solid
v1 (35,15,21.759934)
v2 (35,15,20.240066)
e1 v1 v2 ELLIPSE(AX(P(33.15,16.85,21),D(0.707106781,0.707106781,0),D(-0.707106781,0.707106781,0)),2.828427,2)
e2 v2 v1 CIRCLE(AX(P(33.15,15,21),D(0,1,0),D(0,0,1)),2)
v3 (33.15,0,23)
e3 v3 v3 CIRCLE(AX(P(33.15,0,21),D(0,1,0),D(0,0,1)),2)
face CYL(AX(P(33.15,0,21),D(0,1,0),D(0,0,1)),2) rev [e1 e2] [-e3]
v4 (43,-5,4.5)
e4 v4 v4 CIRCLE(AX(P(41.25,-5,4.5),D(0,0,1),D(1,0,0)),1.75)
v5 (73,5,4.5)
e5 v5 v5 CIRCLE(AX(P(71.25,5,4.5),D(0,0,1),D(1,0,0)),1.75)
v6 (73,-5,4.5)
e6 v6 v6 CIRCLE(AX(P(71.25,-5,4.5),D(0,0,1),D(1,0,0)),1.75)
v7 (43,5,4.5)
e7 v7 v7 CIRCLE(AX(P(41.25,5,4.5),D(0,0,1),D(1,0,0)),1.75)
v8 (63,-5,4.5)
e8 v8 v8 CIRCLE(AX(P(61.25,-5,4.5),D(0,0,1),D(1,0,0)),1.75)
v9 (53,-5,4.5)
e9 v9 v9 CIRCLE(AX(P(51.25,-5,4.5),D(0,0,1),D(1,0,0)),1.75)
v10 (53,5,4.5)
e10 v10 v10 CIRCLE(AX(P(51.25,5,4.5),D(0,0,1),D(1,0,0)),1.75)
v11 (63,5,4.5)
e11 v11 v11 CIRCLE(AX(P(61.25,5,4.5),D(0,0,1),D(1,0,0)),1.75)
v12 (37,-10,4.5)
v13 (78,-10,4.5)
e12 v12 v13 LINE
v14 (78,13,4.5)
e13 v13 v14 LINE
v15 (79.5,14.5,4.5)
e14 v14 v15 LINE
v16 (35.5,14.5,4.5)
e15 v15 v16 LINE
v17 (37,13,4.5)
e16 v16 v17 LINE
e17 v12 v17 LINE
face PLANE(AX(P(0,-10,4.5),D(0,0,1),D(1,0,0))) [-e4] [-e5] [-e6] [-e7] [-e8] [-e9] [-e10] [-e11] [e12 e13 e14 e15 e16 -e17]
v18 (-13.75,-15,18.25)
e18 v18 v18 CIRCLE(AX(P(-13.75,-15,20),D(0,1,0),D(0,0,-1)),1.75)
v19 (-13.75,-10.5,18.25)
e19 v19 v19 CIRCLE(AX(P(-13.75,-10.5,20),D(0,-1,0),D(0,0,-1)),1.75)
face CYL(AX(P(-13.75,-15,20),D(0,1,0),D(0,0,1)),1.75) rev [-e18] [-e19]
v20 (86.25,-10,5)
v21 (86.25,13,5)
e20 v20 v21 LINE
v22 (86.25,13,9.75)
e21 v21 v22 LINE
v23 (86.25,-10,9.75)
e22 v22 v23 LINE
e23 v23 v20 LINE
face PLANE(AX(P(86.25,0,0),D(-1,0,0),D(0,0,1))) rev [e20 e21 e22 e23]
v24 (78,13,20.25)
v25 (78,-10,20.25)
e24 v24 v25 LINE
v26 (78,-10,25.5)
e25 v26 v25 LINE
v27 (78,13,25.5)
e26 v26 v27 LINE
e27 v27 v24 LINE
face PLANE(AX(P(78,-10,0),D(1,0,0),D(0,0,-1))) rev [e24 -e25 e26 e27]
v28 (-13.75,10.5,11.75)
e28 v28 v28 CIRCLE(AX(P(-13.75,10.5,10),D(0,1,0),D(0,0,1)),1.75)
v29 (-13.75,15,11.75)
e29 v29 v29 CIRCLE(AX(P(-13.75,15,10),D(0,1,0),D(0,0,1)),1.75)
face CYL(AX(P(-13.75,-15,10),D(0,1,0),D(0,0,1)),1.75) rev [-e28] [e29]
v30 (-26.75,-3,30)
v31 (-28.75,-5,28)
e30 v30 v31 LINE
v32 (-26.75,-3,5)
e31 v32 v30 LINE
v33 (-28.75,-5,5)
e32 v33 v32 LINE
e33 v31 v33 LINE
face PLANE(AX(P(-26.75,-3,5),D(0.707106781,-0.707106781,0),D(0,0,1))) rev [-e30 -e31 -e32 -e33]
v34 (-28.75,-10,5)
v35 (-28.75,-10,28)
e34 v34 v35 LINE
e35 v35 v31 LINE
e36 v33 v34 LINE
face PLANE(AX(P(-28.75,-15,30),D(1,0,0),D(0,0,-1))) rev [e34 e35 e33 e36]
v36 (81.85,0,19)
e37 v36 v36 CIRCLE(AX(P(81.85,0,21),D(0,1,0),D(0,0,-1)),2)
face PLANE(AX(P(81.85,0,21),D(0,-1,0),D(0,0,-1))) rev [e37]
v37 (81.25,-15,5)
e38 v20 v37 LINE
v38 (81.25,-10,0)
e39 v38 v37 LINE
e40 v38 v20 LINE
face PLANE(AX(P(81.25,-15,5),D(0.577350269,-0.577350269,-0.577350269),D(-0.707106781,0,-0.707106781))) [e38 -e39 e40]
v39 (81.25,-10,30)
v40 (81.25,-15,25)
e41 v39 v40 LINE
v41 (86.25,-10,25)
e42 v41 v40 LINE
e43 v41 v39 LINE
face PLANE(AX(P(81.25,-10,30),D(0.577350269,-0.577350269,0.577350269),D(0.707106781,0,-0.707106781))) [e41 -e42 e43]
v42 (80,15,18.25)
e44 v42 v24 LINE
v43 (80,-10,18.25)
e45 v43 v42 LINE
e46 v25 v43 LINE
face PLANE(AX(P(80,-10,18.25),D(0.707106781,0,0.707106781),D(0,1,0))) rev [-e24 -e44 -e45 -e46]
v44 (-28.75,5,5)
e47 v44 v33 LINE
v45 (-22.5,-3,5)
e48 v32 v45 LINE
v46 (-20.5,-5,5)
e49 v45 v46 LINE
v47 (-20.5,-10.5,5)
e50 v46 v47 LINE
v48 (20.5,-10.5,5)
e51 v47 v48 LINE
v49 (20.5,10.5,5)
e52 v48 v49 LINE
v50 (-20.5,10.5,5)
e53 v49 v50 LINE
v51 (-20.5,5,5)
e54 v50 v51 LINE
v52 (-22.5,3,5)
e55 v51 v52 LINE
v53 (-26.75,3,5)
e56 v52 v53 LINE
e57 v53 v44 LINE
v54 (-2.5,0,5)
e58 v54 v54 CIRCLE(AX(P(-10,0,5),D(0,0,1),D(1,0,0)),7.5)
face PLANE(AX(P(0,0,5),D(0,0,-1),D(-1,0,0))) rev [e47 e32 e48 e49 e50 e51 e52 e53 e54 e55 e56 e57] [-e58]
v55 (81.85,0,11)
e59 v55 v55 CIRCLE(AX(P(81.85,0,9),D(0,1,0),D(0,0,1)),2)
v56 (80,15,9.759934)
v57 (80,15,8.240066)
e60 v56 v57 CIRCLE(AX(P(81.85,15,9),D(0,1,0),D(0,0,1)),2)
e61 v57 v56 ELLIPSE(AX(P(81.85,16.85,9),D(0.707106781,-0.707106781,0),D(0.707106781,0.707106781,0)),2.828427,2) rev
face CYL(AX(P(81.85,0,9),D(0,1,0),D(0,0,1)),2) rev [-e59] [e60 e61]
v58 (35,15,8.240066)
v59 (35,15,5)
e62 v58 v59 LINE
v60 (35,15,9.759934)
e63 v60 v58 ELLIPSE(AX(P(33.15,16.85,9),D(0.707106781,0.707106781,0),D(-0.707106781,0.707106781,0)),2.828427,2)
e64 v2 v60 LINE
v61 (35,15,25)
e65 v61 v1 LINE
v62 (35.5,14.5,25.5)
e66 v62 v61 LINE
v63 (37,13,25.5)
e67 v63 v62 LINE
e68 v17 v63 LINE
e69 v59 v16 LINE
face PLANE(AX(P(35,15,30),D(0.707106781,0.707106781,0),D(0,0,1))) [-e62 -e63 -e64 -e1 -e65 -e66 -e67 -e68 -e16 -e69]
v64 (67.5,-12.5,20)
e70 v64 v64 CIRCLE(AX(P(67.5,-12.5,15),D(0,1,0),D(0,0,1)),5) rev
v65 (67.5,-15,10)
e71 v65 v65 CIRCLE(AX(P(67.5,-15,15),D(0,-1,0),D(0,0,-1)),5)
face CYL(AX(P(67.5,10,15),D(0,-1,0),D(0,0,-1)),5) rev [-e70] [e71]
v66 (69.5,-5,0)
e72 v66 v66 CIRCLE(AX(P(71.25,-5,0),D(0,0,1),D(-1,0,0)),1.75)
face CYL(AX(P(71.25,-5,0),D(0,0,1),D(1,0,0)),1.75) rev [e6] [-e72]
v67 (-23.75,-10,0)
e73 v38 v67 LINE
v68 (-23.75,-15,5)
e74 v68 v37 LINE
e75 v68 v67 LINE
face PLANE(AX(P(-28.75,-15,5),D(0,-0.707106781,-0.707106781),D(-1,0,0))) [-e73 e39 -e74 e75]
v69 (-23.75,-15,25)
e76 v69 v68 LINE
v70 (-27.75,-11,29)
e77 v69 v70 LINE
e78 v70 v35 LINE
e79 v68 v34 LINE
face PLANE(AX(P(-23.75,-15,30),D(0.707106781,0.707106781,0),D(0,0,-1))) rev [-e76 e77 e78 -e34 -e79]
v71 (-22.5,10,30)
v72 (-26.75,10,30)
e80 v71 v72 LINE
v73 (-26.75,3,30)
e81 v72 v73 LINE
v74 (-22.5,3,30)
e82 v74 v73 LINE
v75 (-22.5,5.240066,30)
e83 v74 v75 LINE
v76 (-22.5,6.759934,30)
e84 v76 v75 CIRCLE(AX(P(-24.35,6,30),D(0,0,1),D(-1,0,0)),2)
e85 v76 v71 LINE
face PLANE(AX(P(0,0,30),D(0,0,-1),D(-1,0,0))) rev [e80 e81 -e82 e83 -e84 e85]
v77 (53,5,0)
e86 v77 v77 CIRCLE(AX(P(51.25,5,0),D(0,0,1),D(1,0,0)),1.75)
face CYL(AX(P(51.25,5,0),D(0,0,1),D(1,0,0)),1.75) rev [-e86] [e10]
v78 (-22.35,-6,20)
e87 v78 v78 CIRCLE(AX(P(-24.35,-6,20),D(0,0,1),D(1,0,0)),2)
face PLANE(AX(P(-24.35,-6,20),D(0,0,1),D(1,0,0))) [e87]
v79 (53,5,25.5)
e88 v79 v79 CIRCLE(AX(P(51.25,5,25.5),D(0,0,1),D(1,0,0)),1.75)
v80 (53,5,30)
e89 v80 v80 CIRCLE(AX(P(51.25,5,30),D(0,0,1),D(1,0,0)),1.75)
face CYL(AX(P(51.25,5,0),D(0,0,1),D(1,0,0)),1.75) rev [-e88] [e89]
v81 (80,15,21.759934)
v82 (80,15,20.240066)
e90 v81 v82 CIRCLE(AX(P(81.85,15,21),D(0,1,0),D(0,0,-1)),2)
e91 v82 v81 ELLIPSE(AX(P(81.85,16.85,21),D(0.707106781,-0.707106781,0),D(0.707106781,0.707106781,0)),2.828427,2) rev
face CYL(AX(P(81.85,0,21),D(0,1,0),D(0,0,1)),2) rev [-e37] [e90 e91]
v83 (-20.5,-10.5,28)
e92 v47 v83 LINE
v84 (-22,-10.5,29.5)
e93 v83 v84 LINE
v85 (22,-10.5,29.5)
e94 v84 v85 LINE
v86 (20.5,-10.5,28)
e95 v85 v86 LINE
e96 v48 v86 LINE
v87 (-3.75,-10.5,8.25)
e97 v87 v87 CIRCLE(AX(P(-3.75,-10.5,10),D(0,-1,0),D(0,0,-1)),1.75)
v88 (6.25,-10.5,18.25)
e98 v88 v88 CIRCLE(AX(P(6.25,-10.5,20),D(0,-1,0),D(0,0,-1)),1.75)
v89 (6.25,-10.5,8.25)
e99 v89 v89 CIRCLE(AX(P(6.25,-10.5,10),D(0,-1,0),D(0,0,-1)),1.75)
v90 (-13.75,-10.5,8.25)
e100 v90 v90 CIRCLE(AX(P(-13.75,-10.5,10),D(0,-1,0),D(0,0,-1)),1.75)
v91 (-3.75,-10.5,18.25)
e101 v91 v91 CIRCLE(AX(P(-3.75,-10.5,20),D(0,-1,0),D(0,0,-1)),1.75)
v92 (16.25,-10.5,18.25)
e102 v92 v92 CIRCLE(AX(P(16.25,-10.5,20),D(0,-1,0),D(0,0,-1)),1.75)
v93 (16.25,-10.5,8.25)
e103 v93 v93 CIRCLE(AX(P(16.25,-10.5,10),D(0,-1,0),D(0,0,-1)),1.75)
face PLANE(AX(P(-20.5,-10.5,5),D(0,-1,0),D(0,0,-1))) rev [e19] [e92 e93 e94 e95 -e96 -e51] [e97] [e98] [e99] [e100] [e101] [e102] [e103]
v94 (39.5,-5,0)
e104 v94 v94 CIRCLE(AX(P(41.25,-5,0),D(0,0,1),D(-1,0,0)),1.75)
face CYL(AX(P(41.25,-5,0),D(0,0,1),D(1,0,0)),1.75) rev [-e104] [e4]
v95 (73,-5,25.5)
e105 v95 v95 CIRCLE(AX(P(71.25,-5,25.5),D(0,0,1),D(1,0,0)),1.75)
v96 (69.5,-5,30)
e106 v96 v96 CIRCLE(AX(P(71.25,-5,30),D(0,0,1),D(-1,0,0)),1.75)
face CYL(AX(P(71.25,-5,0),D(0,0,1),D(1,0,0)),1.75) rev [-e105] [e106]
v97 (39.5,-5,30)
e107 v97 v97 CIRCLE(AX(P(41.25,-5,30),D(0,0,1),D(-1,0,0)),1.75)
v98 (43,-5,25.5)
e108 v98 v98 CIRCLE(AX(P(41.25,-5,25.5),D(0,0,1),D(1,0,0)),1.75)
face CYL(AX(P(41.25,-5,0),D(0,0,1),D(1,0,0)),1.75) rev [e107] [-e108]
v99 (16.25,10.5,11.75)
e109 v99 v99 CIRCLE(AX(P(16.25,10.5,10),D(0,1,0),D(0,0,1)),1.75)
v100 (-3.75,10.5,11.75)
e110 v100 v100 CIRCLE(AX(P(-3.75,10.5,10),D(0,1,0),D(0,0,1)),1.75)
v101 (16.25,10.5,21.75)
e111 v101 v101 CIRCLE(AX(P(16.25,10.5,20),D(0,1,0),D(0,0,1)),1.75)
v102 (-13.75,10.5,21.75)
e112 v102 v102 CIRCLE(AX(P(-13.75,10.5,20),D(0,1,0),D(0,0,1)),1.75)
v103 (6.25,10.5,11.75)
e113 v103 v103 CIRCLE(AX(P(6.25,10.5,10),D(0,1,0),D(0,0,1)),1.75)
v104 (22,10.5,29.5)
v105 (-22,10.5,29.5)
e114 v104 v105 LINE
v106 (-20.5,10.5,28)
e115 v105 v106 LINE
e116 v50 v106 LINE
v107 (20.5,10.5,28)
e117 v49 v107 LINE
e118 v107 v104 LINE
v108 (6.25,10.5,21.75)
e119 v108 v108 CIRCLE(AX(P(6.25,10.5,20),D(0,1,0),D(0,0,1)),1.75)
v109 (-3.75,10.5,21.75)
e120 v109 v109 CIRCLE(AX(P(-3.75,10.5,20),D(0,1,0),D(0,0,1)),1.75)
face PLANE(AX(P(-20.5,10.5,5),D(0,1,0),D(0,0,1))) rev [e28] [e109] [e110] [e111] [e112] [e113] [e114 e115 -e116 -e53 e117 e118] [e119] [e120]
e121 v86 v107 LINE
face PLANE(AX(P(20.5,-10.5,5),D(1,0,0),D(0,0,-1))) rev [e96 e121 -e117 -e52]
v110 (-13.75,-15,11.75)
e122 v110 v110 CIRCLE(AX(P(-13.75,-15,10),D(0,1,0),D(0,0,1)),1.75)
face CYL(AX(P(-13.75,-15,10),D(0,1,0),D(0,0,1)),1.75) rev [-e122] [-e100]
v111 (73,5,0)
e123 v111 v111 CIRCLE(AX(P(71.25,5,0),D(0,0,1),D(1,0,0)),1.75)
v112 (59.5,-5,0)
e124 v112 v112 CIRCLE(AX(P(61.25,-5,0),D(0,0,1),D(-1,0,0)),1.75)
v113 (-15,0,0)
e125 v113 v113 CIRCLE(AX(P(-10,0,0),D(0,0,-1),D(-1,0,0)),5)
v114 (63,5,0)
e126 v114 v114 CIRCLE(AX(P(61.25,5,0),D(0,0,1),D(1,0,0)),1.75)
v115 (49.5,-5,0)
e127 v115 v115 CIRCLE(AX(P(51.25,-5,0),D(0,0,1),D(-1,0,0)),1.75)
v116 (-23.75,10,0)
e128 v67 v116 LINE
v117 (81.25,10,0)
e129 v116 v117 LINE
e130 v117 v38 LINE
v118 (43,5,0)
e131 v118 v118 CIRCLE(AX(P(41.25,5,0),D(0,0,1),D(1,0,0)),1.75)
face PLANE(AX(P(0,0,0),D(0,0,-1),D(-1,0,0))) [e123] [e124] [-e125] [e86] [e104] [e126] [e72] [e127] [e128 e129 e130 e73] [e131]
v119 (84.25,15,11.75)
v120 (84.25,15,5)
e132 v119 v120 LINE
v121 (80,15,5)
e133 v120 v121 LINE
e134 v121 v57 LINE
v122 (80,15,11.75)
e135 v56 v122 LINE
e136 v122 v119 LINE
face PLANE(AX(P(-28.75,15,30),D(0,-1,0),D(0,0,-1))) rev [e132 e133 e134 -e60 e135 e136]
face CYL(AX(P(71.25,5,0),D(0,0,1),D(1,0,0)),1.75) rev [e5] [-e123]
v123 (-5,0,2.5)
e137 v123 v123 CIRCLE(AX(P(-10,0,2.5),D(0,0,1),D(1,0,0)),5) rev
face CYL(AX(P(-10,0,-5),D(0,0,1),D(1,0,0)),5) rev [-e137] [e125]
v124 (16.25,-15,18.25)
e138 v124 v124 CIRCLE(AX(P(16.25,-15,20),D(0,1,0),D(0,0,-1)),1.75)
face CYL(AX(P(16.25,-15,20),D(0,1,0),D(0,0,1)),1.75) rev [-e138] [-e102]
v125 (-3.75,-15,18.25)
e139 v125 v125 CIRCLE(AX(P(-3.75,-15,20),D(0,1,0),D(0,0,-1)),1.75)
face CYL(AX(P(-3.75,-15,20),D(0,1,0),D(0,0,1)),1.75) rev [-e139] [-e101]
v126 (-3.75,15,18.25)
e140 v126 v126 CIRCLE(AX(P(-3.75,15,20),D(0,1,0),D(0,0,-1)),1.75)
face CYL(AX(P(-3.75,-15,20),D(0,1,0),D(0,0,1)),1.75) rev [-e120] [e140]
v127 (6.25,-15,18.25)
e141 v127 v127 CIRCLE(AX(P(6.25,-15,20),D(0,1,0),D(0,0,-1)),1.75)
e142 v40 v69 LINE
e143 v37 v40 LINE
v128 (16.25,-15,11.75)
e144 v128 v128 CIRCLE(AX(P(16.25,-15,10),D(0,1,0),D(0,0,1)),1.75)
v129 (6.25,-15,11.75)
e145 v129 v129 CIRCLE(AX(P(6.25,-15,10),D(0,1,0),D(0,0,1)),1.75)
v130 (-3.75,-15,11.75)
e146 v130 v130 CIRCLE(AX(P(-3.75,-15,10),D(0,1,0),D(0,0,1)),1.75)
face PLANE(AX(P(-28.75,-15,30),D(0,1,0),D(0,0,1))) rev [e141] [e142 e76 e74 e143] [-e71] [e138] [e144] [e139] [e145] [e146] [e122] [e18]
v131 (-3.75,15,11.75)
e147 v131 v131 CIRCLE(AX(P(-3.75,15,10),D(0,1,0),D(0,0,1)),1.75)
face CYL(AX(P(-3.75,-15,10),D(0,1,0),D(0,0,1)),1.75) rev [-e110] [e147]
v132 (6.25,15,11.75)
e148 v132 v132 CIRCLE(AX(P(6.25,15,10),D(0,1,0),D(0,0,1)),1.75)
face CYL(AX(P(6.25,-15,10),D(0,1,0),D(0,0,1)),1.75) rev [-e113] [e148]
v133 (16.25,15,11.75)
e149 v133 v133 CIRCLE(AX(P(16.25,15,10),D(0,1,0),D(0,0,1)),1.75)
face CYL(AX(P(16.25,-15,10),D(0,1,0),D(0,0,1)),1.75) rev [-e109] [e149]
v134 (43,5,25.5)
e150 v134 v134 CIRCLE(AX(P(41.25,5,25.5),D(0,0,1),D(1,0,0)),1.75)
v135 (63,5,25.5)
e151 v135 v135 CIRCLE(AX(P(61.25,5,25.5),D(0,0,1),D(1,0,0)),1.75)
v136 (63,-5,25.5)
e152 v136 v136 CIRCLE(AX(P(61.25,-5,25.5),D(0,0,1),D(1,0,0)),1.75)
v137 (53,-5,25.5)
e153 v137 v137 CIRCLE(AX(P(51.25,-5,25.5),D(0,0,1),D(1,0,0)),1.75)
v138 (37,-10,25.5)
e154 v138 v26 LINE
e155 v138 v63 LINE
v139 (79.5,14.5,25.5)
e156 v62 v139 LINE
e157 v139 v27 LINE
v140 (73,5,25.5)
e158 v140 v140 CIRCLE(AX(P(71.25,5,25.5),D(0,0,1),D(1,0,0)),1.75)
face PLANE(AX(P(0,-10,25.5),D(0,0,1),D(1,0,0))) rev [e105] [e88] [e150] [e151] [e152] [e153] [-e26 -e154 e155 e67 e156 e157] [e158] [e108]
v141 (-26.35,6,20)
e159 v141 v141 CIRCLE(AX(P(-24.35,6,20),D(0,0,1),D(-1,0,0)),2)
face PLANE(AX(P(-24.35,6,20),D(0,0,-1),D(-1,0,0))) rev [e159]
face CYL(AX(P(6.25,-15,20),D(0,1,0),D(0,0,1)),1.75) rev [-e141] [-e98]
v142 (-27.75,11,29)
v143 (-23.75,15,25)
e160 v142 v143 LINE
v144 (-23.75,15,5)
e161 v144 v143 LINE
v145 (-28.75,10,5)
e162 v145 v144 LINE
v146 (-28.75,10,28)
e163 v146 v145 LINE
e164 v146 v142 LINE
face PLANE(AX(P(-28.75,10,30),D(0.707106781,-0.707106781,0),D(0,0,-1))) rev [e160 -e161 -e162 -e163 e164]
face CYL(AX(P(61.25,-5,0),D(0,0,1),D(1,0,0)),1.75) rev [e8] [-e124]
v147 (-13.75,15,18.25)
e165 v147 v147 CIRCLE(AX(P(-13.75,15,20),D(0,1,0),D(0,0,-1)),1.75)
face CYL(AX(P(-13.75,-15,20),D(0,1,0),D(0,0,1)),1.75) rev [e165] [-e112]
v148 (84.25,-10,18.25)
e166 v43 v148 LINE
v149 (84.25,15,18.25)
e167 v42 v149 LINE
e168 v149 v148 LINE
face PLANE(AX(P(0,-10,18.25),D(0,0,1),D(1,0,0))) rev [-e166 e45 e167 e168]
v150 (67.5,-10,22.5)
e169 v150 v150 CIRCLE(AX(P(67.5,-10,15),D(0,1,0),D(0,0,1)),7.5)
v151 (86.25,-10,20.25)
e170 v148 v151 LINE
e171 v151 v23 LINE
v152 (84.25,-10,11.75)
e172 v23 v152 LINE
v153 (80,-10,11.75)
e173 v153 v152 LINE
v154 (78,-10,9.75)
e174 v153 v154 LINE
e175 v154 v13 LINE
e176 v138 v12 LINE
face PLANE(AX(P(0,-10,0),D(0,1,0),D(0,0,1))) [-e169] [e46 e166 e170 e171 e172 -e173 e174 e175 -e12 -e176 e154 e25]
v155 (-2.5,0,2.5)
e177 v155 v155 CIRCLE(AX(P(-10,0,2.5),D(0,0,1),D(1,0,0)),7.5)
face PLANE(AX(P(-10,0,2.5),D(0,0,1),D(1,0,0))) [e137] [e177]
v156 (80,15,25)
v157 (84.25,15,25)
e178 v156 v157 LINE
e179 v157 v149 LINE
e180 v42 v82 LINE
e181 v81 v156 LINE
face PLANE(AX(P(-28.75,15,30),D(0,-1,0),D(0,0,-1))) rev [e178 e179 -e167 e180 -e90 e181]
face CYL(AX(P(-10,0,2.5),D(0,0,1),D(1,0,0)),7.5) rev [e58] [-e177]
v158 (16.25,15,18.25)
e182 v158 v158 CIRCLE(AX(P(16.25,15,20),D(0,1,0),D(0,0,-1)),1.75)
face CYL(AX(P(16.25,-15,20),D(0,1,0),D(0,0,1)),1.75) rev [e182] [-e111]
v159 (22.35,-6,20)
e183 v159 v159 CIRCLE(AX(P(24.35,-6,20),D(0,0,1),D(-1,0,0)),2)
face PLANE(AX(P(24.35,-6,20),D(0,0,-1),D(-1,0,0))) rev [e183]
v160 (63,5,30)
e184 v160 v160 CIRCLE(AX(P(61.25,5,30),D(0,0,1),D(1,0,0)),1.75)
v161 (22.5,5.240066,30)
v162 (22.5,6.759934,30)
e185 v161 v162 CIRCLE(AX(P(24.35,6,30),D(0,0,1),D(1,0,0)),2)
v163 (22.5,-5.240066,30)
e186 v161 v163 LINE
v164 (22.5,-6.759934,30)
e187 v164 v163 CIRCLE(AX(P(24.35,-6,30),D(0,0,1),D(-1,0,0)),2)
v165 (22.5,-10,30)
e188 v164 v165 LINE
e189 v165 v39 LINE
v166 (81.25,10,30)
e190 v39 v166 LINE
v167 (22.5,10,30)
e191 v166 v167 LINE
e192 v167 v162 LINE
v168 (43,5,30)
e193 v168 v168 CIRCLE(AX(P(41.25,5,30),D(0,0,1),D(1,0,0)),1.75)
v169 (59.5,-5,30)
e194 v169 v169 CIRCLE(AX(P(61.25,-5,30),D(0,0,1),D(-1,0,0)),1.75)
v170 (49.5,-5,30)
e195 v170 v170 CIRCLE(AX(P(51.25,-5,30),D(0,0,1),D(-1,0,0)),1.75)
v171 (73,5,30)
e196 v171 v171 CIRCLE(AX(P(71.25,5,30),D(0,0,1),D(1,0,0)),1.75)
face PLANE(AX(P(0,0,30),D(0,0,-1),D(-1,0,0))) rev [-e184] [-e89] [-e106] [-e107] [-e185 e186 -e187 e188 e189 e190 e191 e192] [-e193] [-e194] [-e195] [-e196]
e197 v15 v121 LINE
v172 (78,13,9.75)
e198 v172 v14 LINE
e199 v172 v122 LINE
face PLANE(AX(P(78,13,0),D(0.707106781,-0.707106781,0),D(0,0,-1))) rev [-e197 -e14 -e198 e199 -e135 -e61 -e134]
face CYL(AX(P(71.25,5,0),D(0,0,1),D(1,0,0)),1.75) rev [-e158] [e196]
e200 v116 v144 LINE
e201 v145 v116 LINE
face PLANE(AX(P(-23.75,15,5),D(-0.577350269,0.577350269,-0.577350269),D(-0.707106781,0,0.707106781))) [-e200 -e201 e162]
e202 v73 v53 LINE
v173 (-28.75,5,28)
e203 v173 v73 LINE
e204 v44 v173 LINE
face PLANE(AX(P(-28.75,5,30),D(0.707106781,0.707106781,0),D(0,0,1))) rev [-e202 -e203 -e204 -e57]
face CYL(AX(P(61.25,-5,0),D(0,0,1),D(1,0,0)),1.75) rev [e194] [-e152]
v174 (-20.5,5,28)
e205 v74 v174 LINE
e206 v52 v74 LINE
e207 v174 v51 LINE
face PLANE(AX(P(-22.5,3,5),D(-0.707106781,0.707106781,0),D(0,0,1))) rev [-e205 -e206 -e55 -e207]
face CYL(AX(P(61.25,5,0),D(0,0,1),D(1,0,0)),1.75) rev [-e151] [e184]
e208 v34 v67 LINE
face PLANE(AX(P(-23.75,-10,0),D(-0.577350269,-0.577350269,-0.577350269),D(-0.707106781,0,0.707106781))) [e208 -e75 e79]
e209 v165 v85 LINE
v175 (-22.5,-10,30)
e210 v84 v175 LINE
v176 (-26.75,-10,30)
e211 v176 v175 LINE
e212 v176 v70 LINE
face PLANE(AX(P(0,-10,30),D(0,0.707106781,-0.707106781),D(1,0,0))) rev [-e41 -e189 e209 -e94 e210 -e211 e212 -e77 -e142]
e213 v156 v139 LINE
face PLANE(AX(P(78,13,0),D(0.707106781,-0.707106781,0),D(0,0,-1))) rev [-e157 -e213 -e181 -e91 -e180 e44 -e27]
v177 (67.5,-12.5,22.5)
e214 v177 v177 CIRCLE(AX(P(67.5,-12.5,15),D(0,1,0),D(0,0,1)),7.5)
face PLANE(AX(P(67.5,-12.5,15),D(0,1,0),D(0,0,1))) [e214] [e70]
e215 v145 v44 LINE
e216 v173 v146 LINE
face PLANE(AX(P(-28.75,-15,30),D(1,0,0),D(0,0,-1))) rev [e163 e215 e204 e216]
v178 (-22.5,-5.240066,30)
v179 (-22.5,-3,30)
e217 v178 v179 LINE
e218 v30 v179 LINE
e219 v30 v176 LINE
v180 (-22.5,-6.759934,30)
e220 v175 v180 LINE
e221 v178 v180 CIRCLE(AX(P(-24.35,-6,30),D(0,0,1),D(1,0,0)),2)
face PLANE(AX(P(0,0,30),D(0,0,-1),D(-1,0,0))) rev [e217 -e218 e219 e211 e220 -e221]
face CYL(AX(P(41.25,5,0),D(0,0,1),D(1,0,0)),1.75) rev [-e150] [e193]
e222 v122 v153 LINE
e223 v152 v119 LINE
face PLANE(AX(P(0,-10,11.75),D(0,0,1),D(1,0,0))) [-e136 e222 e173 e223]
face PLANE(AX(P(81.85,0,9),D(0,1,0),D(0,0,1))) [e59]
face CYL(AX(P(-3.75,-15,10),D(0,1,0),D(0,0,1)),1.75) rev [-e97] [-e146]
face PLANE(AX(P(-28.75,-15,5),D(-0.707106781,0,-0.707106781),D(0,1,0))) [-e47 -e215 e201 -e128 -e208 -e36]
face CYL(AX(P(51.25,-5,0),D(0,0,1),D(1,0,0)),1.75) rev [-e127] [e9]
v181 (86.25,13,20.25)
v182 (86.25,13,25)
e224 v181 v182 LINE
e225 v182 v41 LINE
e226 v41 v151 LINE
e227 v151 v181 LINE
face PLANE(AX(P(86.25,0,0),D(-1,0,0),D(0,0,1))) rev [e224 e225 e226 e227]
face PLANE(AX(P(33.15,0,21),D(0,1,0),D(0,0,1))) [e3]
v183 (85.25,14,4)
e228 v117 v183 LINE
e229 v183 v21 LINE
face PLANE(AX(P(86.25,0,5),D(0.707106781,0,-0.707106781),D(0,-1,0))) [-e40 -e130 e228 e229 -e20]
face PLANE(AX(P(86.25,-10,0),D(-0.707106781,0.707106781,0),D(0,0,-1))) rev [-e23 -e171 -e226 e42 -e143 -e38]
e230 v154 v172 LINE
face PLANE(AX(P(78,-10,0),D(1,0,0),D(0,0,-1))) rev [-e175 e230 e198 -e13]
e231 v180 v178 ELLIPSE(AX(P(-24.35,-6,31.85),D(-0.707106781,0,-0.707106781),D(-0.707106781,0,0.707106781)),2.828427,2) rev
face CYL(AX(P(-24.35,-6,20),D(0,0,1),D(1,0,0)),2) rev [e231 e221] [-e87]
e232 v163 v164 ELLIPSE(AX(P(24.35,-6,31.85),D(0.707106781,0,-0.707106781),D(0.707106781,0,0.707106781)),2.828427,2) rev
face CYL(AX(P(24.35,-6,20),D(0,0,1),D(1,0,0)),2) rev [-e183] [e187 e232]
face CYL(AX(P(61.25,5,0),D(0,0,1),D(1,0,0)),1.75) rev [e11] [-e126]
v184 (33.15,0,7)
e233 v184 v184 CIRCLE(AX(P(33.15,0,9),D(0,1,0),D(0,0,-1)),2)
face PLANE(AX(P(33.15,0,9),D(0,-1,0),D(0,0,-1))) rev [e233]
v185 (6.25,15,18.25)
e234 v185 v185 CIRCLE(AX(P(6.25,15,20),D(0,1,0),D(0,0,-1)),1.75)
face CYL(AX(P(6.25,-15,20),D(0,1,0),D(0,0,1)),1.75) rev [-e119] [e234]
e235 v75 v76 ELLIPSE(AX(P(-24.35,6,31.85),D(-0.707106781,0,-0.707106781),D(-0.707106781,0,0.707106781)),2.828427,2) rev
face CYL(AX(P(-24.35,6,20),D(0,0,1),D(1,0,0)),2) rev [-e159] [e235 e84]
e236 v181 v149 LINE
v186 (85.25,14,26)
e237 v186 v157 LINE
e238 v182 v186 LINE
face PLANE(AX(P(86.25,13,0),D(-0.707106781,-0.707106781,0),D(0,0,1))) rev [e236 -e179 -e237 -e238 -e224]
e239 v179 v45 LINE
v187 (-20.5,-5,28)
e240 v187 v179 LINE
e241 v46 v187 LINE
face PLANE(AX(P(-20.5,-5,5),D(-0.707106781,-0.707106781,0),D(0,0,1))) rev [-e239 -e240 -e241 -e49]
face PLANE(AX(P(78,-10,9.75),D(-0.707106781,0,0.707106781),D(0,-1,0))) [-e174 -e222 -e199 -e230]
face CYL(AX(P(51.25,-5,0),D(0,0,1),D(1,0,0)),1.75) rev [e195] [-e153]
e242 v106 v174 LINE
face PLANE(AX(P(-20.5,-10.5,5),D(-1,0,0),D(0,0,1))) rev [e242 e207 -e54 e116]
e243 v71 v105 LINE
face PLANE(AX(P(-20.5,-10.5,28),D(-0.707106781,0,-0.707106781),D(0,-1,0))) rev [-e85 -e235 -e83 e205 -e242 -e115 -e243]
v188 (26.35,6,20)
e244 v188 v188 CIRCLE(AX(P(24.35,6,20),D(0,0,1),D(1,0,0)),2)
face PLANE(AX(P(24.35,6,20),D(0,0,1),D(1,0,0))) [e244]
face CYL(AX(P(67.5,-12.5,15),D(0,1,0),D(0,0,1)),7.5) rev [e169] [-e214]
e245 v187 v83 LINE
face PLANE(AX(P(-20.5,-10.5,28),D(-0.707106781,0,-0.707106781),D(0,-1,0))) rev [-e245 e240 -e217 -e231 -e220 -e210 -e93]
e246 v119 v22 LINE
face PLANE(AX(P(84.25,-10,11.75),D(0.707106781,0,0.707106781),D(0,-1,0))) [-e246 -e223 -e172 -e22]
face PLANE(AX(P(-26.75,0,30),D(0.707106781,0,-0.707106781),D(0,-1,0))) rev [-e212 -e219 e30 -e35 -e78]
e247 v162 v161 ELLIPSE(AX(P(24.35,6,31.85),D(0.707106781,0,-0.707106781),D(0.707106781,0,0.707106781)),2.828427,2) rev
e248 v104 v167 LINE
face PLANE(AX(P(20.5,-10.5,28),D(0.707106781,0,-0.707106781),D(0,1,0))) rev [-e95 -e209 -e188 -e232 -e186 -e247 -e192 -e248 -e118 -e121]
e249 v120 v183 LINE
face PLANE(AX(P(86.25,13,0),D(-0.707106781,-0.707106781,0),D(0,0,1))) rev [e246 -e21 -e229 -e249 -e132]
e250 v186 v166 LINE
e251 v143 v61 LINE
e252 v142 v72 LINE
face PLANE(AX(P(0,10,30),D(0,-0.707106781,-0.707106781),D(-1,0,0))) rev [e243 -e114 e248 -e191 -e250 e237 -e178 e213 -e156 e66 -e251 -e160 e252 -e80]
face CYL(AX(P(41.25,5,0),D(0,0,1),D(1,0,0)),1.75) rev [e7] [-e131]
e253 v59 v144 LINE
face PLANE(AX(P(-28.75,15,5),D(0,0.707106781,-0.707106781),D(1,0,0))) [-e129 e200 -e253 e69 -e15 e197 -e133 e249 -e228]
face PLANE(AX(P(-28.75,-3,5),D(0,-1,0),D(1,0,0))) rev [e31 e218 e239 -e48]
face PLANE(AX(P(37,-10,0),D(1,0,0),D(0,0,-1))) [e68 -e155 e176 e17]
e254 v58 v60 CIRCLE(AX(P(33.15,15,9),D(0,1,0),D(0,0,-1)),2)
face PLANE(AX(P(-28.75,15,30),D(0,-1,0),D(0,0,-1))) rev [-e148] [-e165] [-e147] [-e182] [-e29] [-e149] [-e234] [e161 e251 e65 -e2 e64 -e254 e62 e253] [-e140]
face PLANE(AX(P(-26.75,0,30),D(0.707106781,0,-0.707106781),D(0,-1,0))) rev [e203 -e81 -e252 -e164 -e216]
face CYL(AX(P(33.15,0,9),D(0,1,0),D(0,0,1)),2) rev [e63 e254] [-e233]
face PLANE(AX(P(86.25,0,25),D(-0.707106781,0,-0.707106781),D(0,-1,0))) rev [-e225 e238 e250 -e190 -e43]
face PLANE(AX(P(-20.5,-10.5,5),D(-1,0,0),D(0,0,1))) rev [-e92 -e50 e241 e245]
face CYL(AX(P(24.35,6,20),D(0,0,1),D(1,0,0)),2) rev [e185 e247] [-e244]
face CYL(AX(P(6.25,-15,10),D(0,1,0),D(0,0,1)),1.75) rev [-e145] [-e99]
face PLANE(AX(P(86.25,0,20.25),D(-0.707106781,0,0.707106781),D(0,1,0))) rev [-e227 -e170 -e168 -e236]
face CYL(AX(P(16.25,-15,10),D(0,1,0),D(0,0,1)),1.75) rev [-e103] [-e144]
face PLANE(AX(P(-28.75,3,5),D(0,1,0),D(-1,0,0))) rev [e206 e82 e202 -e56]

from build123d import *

# Parameters (mm, degrees)
SKETCH1_W           = 57.5
SKETCH1_H           = 30
BOSS_EXTRUDE1_DEPTH = 30
SKETCH2_W           = 41
SKETCH2_H           = 21
CUT_EXTRUDE1_DEPTH  = 25
SKETCH8_R           = 2
CUT_EXTRUDE6_DEPTH  = 10
SKETCH9_W           = 8.25
SKETCH9_H           = 6
CUT_EXTRUDE7_DEPTH  = 25
SKETCH10_R          = 5
CUT_EXTRUDE8_DEPTH  = 10
SKETCH11_W          = 30
SKETCH11_H          = 30
BOSS_EXTRUDE2_DEPTH = 57.5
SKETCH14_R          = 2
CUT_EXTRUDE14_DEPTH = 15
SKETCH18_W          = 41
SKETCH18_H          = 21
SKETCH18_W_2        = 8.25
SKETCH18_H_2        = 6.5
CUT_EXTRUDE15_DEPTH = 25
SKETCH19_R          = 5
CUT_EXTRUDE16_DEPTH = 25
CHAMFER5_SIZE       = 2
SKETCH23_R          = 1.75
CUT_EXTRUDE19_DEPTH = 93.542220094
SKETCH24_R          = 1.75
CUT_EXTRUDE20_DEPTH = 97.120042135
SKETCH26_R          = 7.5
CUT_EXTRUDE21_DEPTH = 2.5
SKETCH27_R          = 7.5
CUT_EXTRUDE22_DEPTH = 2.5


with BuildPart() as part:
    # Sketch1 → Boss-Extrude1 (new body)
    with BuildSketch(Plane.XY):
        Rectangle(SKETCH1_W, SKETCH1_H)
    extrude(amount=BOSS_EXTRUDE1_DEPTH)

    # Sketch2 → Cut-Extrude1 (cut)
    with BuildSketch(Plane.XY.offset(30)):
        Rectangle(SKETCH2_W, SKETCH2_H)
    extrude(amount=-CUT_EXTRUDE1_DEPTH, mode=Mode.SUBTRACT)

    # Sketch8 → Cut-Extrude6 (cut)
    with BuildSketch(Plane.XY.offset(30)):
        with Locations((24.35, 6)):
            Circle(SKETCH8_R)
        with Locations(Location((24.35, -6, 0), (0, 0, 180))):
            Circle(SKETCH8_R)
        with Locations((-24.35, -6)):
            Circle(SKETCH8_R)
        with Locations(Location((-24.35, 6, 0), (0, 0, 180))):
            Circle(SKETCH8_R)
    extrude(amount=-CUT_EXTRUDE6_DEPTH, mode=Mode.SUBTRACT)

    # Sketch9 → Cut-Extrude7 (cut)
    with BuildSketch(Plane.XY.offset(30)):
        with Locations((-24.625, 0)):
            Rectangle(SKETCH9_W, SKETCH9_H)
    extrude(amount=-CUT_EXTRUDE7_DEPTH, mode=Mode.SUBTRACT)

    # Sketch10 → Cut-Extrude8 (cut)
    with BuildSketch(Plane.XY.offset(5)):
        with Locations((-10, 0)):
            Circle(SKETCH10_R)
    extrude(amount=-CUT_EXTRUDE8_DEPTH, mode=Mode.SUBTRACT)

    # Sketch11 → Boss-Extrude2 (add)
    with BuildSketch(Plane(origin=(28.75, 0, 0), x_dir=(0, 0, -1), z_dir=(1, 0, 0))):
        with Locations((-15, 0)):
            Rectangle(SKETCH11_W, SKETCH11_H)
    extrude(amount=BOSS_EXTRUDE2_DEPTH)

    # Sketch14 → Cut-Extrude14 (cut)
    with BuildSketch(Plane(origin=(0, 15, 0), x_dir=(1, 0, 0), z_dir=(0, 1, 0))):
        with Locations(Location((81.85, -9, 0), (0, 0, 270))):
            Circle(SKETCH14_R)
        with Locations(Location((81.85, -21, 0), (0, 0, 90))):
            Circle(SKETCH14_R)
        with Locations(Location((33.15, -21, 0), (0, 0, 270))):
            Circle(SKETCH14_R)
        with Locations(Location((33.15, -9, 0), (0, 0, 90))):
            Circle(SKETCH14_R)
    extrude(amount=-CUT_EXTRUDE14_DEPTH, mode=Mode.SUBTRACT)

    # Sketch18 → Cut-Extrude15 (cut)
    with BuildSketch(Plane(origin=(0, 15, 0), x_dir=(1, 0, 0), z_dir=(0, 1, 0))):
        with Locations((57.5, -15)):
            Rectangle(SKETCH18_W, SKETCH18_H)
        with Locations((82.125, -15)):
            Rectangle(SKETCH18_W_2, SKETCH18_H_2)
    extrude(amount=-CUT_EXTRUDE15_DEPTH, mode=Mode.SUBTRACT)

    # Sketch19 → Cut-Extrude16 (cut)
    with BuildSketch(Plane.XZ.offset(15)):
        with Locations(Location((67.5, 15, 0), (0, 0, 270))):
            Circle(SKETCH19_R)
    extrude(amount=-CUT_EXTRUDE16_DEPTH, mode=Mode.SUBTRACT)

    # Chamfer4
    # the kernel refuses this chamfer: 5 mm, written as the material it takes off along each edge
    with BuildSketch(Plane(origin=(-25.416666667, -11.666666667, 3.333333333), x_dir=(-0.7071067811865475, 0.7071067811865477, 0), z_dir=(-0.5773502691896258, -0.5773502691896257, -0.5773502691896257)), Plane(origin=(82.916666667, -11.666666667, 3.333333333), x_dir=(0, 0.707106781186547, -0.707106781186548), z_dir=(0.577350269189626, -0.5773502691896262, -0.5773502691896253)), Plane(origin=(-25.416666667, 11.666666667, 3.333333333), x_dir=(0, -0.7071067811865475, -0.7071067811865475), z_dir=(-0.5773502691896257, 0.5773502691896257, -0.5773502691896257))) as chamfer4_piece_1:
        Polygon((-3.535533906, -2.041241452), (3.535533906, -2.041241452), (0, 4.082482905), align=None)
    extrude(amount=6.350852961, mode=Mode.SUBTRACT)
    with BuildSketch(Plane(origin=(82.916666667, -11.666666667, 26.666666667), x_dir=(0, 0.7071067811865474, 0.7071067811865476), z_dir=(0.5773502691896257, -0.5773502691896258, 0.5773502691896257))) as chamfer4_piece_2:
        Polygon((-3.535533906, 2.041241452), (3.535533906, 2.041241452), (0, -4.082482905), align=None)
    extrude(amount=6.350852961, mode=Mode.SUBTRACT)
    with BuildSketch(Plane(origin=(-41.60841494, -15, 0), x_dir=(0, -0.027495876610586317, 0.9996219169112968), z_dir=(1, 0, 0)), Plane(origin=(99.10841494, -15, 30), x_dir=(0, -0.027495876610586317, -0.9996219169112968), z_dir=(-1, 0, 0)), Plane(origin=(99.10841494, 15, 30), x_dir=(0, -0.9996219169112968, 0.027495876610586317), z_dir=(-1, 0, 0)), Plane(origin=(-41.60841494, 15, 0), x_dir=(0, -0.9996219169112968, -0.027495876610586372), z_dir=(1, 0, 0))) as chamfer4_piece_3:
        with BuildLine():
            Line((5.143365976, 0), (-0.282735774, -5.135588968))
            Line((-0.282735774, -5.135588968), (-0.382697966, -5.13283938))
            ThreePointArc((-0.382697966, -5.13283938), (-0.170646135, -2.566989148), (-0.099962192, 0.002749588))
            Line((-0.099962192, 0.002749588), (0.002749588, 0.099962192))
            ThreePointArc((0.002749588, 0.099962192), (2.572488324, 0.029278248), (5.146115564, 0.099962192))
            Line((5.146115564, 0.099962192), (5.143365976, 0))
        make_face()
    extrude(amount=140.71682988, mode=Mode.SUBTRACT)
    with BuildSketch(Plane(origin=(86.25, 27.85841494, 30), x_dir=(-0.9996219169112968, 0, 0.027495876610586282), z_dir=(0, -1, 0)), Plane(origin=(86.25, -15, 42.85841494), x_dir=(-0.9996219169112968, -0.027495876610586282, 0), z_dir=(0, 0, -1)), Plane(origin=(86.25, -27.85841494, 0), x_dir=(-0.9996219169112968, 0, -0.027495876610586334), z_dir=(0, 1, 0)), Plane(origin=(-28.75, 15, -12.85841494), x_dir=(-0.027495876610586317, -0.9996219169112968, 0), z_dir=(0, 0, 1)), Plane(origin=(-28.75, -15, -12.85841494), x_dir=(0.9996219169112968, -0.027495876610586317, 0), z_dir=(0, 0, 1))) as chamfer4_piece_4:
        with BuildLine():
            Line((5.143365976, 0), (-0.282735774, 5.135588968))
            Line((-0.282735774, 5.135588968), (-0.382697966, 5.13283938))
            ThreePointArc((-0.382697966, 5.13283938), (-0.170646135, 2.566989148), (-0.099962192, -0.002749588))
            Line((-0.099962192, -0.002749588), (0.002749588, -0.099962192))
            ThreePointArc((0.002749588, -0.099962192), (2.572488324, -0.029278248), (5.146115564, -0.099962192))
            Line((5.146115564, -0.099962192), (5.143365976, 0))
        make_face()
    extrude(amount=55.71682988, mode=Mode.SUBTRACT)
    with BuildSketch(Plane(origin=(-28.75, 27.85841494, 0), x_dir=(-0.027495876610586317, 0, 0.9996219169112968), z_dir=(0, -1, 0))) as chamfer4_piece_5:
        with BuildLine():
            Line((5.143365976, 0), (-0.282735774, -5.135588968))
            Line((-0.282735774, -5.135588968), (-0.382697966, -5.13283938))
            ThreePointArc((-0.382697966, -5.13283938), (-0.170646135, -2.566989148), (-0.099962192, 0.002749588))
            Line((-0.099962192, 0.002749588), (0.002749588, 0.099962192))
            ThreePointArc((0.002749588, 0.099962192), (2.572488324, 0.029278248), (5.146115564, 0.099962192))
            Line((5.146115564, 0.099962192), (5.143365976, 0))
        make_face()
    extrude(amount=55.71682988, mode=Mode.SUBTRACT)

    # Chamfer5
    # the kernel refuses this chamfer: 2 mm, written as the material it takes off along each edge
    with BuildSketch(Plane(origin=(78, 15, 16.893365976), x_dir=(-0.02749587661058907, -0.9996219169112965, 0), z_dir=(0, 0, -1))) as chamfer5_piece_1_section:
        Polygon((CHAMFER5_SIZE * 0.999621916911, -CHAMFER5_SIZE * 0.0274958766106), (-CHAMFER5_SIZE * 0.0274958766106, -CHAMFER5_SIZE * 0.999621916911), (0, 0), align=None)
    chamfer5_piece_1 = extrude(amount=17.036731952, mode=Mode.PRIVATE)
    chamfer5_piece_1 = split(chamfer5_piece_1, bisect_by=Plane(origin=(78.661782126, 14.324773972, 4.5), z_dir=(0, 0, 1)), keep=Keep.TOP, mode=Mode.PRIVATE)
    add(chamfer5_piece_1, mode=Mode.SUBTRACT)
    with BuildSketch(Plane(origin=(78, 20.143365976, 11.75), x_dir=(-0.02749587661058907, 0, -0.9996219169112965), z_dir=(0, -1, 0)), Plane(origin=(78, 20.143365976, 18.25), x_dir=(0.9996219169112968, 0, -0.02749587661058555), z_dir=(0, -1, 0)), Plane(origin=(86.25, 20.143365976, 18.25), x_dir=(0.0274958766105891, 0, 0.9996219169112968), z_dir=(0, -1, 0)), Plane(origin=(-20.5, -3, 35.143365976), x_dir=(0.027495876610585623, -0.9996219169112968, 0), z_dir=(0, 0, -1)), Plane(origin=(-28.75, 3, 35.143365976), x_dir=(-0.027495876610585623, 0.9996219169112968, 0), z_dir=(0, 0, -1))) as chamfer5_piece_2:
        Polygon((CHAMFER5_SIZE * 0.999621916911, CHAMFER5_SIZE * 0.0274958766106), (-CHAMFER5_SIZE * 0.0274958766106, CHAMFER5_SIZE * 0.999621916911), (0, 0), align=None)
    extrude(amount=30.143365976, mode=Mode.SUBTRACT)
    with BuildSketch(Plane(origin=(86.25, 15, -0.143365976), x_dir=(0.02749587661058907, -0.9996219169112965, 0), z_dir=(0, 0, 1)), Plane(origin=(86.25, 15, 13.106634024), x_dir=(0.02749587661058907, -0.9996219169112965, 0), z_dir=(0, 0, 1))) as chamfer5_piece_3:
        Polygon((CHAMFER5_SIZE * 0.999621916911, -CHAMFER5_SIZE * 0.0274958766106), (-CHAMFER5_SIZE * 0.0274958766106, -CHAMFER5_SIZE * 0.999621916911), (0, 0), align=None)
    extrude(amount=17.036731952, mode=Mode.SUBTRACT)
    with BuildSketch(Plane(origin=(86.25, 20.143365976, 11.75), x_dir=(0.02749587661058907, 0, -0.9996219169112965), z_dir=(0, -1, 0)), Plane(origin=(-28.75, -3, 35.143365976), x_dir=(-0.027495876610585623, -0.9996219169112968, 0), z_dir=(0, 0, -1)), Plane(origin=(-20.5, 3, 35.143365976), x_dir=(0.027495876610585623, 0.9996219169112968, 0), z_dir=(0, 0, -1))) as chamfer5_piece_4:
        Polygon((CHAMFER5_SIZE * 0.999621916911, -CHAMFER5_SIZE * 0.0274958766106), (-CHAMFER5_SIZE * 0.0274958766106, -CHAMFER5_SIZE * 0.999621916911), (0, 0), align=None)
    extrude(amount=30.143365976, mode=Mode.SUBTRACT)
    with BuildSketch(Plane(origin=(78, 15, 30.143365976), x_dir=(0.9996219169112968, 0.027495876610586414, 0), z_dir=(0, 0, -1))) as chamfer5_piece_5_section:
        Polygon((CHAMFER5_SIZE * 0.999621916911, CHAMFER5_SIZE * 0.0274958766106), (-CHAMFER5_SIZE * 0.0274958766106, CHAMFER5_SIZE * 0.999621916911), (0, 0), align=None)
    chamfer5_piece_5 = extrude(amount=17.036731952, mode=Mode.PRIVATE)
    chamfer5_piece_5 = split(chamfer5_piece_5, bisect_by=Plane(origin=(78.661782126, 14.324773972, 25.5), z_dir=(0, 0, -1)), keep=Keep.TOP, mode=Mode.PRIVATE)
    add(chamfer5_piece_5, mode=Mode.SUBTRACT)
    with BuildSketch(Plane(origin=(-28.75, 2.143365976, 30), x_dir=(0.9996219169112968, 0, 0.027495876610585647), z_dir=(0, -1, 0))) as chamfer5_piece_6:
        Polygon((CHAMFER5_SIZE * 0.999621916911, -CHAMFER5_SIZE * 0.0274958766106), (-CHAMFER5_SIZE * 0.0274958766106, -CHAMFER5_SIZE * 0.999621916911), (0, 0), align=None)
    extrude(amount=17.286731952, mode=Mode.SUBTRACT)
    with BuildSketch(Plane(origin=(-20.5, 2.143365976, 30), x_dir=(0.027495876610585647, 0, -0.9996219169112968), z_dir=(0, -1, 0))) as chamfer5_piece_7_section:
        Polygon((CHAMFER5_SIZE * 0.999621916911, -CHAMFER5_SIZE * 0.0274958766106), (-CHAMFER5_SIZE * 0.0274958766106, -CHAMFER5_SIZE * 0.999621916911), (0, 0), align=None)
    chamfer5_piece_7 = extrude(amount=17.286731952, mode=Mode.PRIVATE)
    chamfer5_piece_7 = split(chamfer5_piece_7, bisect_by=Plane(origin=(-21.161947574, -10.5, 29.325063892), z_dir=(0, 1, 0)), keep=Keep.TOP, mode=Mode.PRIVATE)
    add(chamfer5_piece_7, mode=Mode.SUBTRACT)
    with BuildSketch(Plane(origin=(-28.75, 15.143365976, 30), x_dir=(-0.027495876610585647, 0, -0.9996219169112968), z_dir=(0, -1, 0))) as chamfer5_piece_8:
        Polygon((CHAMFER5_SIZE * 0.999621916911, CHAMFER5_SIZE * 0.0274958766106), (-CHAMFER5_SIZE * 0.0274958766106, CHAMFER5_SIZE * 0.999621916911), (0, 0), align=None)
    extrude(amount=17.286731952, mode=Mode.SUBTRACT)
    with BuildSketch(Plane(origin=(-20.5, 15.143365976, 30), x_dir=(-0.9996219169112968, 0, 0.027495876610585647), z_dir=(0, -1, 0))) as chamfer5_piece_9_section:
        Polygon((CHAMFER5_SIZE * 0.999621916911, CHAMFER5_SIZE * 0.0274958766106), (-CHAMFER5_SIZE * 0.0274958766106, CHAMFER5_SIZE * 0.999621916911), (0, 0), align=None)
    chamfer5_piece_9 = extrude(amount=17.286731952, mode=Mode.PRIVATE)
    chamfer5_piece_9 = split(chamfer5_piece_9, bisect_by=Plane(origin=(-21.161947574, 10.5, 29.325063892), z_dir=(0, -1, 0)), keep=Keep.TOP, mode=Mode.PRIVATE)
    add(chamfer5_piece_9, mode=Mode.SUBTRACT)
    with BuildSketch(Plane(origin=(20.5, -15.143365976, 30), x_dir=(0.9996219169112968, 0, 0.027495876610585647), z_dir=(0, 1, 0))) as chamfer5_piece_10_section:
        Polygon((CHAMFER5_SIZE * 0.999621916911, CHAMFER5_SIZE * 0.0274958766106), (-CHAMFER5_SIZE * 0.0274958766106, CHAMFER5_SIZE * 0.999621916911), (0, 0), align=None)
    chamfer5_piece_10 = extrude(amount=30.286731952, mode=Mode.PRIVATE)
    chamfer5_piece_10 = split(chamfer5_piece_10, bisect_by=Plane(origin=(21.163311367, -10.5, 29.327453718), z_dir=(0, 1, 0)), keep=Keep.TOP, mode=Mode.PRIVATE)
    chamfer5_piece_10 = split(chamfer5_piece_10, bisect_by=Plane(origin=(21.163311367, 10.5, 29.327453718), z_dir=(0, -1, 0)), keep=Keep.TOP, mode=Mode.PRIVATE)
    add(chamfer5_piece_10, mode=Mode.SUBTRACT)
    with BuildSketch(Plane(origin=(37, 15, -0.143365976), x_dir=(0.027495876610585623, -0.9996219169112968, 0), z_dir=(0, 0, 1))) as chamfer5_piece_11_section:
        Polygon((CHAMFER5_SIZE * 0.999621916911, -CHAMFER5_SIZE * 0.0274958766106), (-CHAMFER5_SIZE * 0.0274958766106, -CHAMFER5_SIZE * 0.999621916911), (0, 0), align=None)
    chamfer5_piece_11 = extrude(amount=30.286731952, mode=Mode.PRIVATE)
    chamfer5_piece_11 = split(chamfer5_piece_11, bisect_by=Plane(origin=(36.336688633, 14.327453718, 25.5), z_dir=(0, 0, -1)), keep=Keep.TOP, mode=Mode.PRIVATE)
    chamfer5_piece_11 = split(chamfer5_piece_11, bisect_by=Plane(origin=(36.336688633, 14.327453718, 4.5), z_dir=(0, 0, 1)), keep=Keep.TOP, mode=Mode.PRIVATE)
    add(chamfer5_piece_11, mode=Mode.SUBTRACT)

    # Sketch23 → Cut-Extrude19 (cut, through all)
    with BuildSketch(Plane.XY.offset(30)):
        with Locations((71.25, 5)):
            Circle(SKETCH23_R)
        with Locations((71.25, -5)):
            Circle(SKETCH23_R)
        with Locations((61.25, 5)):
            Circle(SKETCH23_R)
        with Locations((61.25, -5)):
            Circle(SKETCH23_R)
        with Locations((51.25, 5)):
            Circle(SKETCH23_R)
        with Locations((51.25, -5)):
            Circle(SKETCH23_R)
        with Locations((41.25, 5)):
            Circle(SKETCH23_R)
        with Locations((41.25, -5)):
            Circle(SKETCH23_R)
    extrude(amount=-CUT_EXTRUDE19_DEPTH, mode=Mode.SUBTRACT)

    # Sketch24 → Cut-Extrude20 (cut, through all)
    with BuildSketch(Plane(origin=(0, 15, 0), x_dir=(1, 0, 0), z_dir=(0, 1, 0))):
        with Locations(Location((-13.75, -10, 0), (0, 0, 270))):
            Circle(SKETCH24_R)
        with Locations(Location((-13.75, -20, 0), (0, 0, 270))):
            Circle(SKETCH24_R)
        with Locations(Location((-3.75, -10, 0), (0, 0, 270))):
            Circle(SKETCH24_R)
        with Locations(Location((-3.75, -20, 0), (0, 0, 270))):
            Circle(SKETCH24_R)
        with Locations(Location((6.25, -10, 0), (0, 0, 270))):
            Circle(SKETCH24_R)
        with Locations(Location((6.25, -20, 0), (0, 0, 270))):
            Circle(SKETCH24_R)
        with Locations(Location((16.25, -10, 0), (0, 0, 270))):
            Circle(SKETCH24_R)
        with Locations(Location((16.25, -20, 0), (0, 0, 270))):
            Circle(SKETCH24_R)
    extrude(amount=-CUT_EXTRUDE20_DEPTH, mode=Mode.SUBTRACT)

    # Sketch26 → Cut-Extrude21 (cut)
    with BuildSketch(Plane.XY.offset(5)):
        with Locations((-10, 0)):
            Circle(SKETCH26_R)
    extrude(amount=-CUT_EXTRUDE21_DEPTH, mode=Mode.SUBTRACT)

    # Sketch27 → Cut-Extrude22 (cut)
    with BuildSketch(Plane(origin=(0, -10, 0), x_dir=(1, 0, 0), z_dir=(0, 1, 0))):
        with Locations(Location((67.5, -15, 0), (0, 0, 270))):
            Circle(SKETCH27_R)
    extrude(amount=-CUT_EXTRUDE22_DEPTH, mode=Mode.SUBTRACT)


solid = part.part
